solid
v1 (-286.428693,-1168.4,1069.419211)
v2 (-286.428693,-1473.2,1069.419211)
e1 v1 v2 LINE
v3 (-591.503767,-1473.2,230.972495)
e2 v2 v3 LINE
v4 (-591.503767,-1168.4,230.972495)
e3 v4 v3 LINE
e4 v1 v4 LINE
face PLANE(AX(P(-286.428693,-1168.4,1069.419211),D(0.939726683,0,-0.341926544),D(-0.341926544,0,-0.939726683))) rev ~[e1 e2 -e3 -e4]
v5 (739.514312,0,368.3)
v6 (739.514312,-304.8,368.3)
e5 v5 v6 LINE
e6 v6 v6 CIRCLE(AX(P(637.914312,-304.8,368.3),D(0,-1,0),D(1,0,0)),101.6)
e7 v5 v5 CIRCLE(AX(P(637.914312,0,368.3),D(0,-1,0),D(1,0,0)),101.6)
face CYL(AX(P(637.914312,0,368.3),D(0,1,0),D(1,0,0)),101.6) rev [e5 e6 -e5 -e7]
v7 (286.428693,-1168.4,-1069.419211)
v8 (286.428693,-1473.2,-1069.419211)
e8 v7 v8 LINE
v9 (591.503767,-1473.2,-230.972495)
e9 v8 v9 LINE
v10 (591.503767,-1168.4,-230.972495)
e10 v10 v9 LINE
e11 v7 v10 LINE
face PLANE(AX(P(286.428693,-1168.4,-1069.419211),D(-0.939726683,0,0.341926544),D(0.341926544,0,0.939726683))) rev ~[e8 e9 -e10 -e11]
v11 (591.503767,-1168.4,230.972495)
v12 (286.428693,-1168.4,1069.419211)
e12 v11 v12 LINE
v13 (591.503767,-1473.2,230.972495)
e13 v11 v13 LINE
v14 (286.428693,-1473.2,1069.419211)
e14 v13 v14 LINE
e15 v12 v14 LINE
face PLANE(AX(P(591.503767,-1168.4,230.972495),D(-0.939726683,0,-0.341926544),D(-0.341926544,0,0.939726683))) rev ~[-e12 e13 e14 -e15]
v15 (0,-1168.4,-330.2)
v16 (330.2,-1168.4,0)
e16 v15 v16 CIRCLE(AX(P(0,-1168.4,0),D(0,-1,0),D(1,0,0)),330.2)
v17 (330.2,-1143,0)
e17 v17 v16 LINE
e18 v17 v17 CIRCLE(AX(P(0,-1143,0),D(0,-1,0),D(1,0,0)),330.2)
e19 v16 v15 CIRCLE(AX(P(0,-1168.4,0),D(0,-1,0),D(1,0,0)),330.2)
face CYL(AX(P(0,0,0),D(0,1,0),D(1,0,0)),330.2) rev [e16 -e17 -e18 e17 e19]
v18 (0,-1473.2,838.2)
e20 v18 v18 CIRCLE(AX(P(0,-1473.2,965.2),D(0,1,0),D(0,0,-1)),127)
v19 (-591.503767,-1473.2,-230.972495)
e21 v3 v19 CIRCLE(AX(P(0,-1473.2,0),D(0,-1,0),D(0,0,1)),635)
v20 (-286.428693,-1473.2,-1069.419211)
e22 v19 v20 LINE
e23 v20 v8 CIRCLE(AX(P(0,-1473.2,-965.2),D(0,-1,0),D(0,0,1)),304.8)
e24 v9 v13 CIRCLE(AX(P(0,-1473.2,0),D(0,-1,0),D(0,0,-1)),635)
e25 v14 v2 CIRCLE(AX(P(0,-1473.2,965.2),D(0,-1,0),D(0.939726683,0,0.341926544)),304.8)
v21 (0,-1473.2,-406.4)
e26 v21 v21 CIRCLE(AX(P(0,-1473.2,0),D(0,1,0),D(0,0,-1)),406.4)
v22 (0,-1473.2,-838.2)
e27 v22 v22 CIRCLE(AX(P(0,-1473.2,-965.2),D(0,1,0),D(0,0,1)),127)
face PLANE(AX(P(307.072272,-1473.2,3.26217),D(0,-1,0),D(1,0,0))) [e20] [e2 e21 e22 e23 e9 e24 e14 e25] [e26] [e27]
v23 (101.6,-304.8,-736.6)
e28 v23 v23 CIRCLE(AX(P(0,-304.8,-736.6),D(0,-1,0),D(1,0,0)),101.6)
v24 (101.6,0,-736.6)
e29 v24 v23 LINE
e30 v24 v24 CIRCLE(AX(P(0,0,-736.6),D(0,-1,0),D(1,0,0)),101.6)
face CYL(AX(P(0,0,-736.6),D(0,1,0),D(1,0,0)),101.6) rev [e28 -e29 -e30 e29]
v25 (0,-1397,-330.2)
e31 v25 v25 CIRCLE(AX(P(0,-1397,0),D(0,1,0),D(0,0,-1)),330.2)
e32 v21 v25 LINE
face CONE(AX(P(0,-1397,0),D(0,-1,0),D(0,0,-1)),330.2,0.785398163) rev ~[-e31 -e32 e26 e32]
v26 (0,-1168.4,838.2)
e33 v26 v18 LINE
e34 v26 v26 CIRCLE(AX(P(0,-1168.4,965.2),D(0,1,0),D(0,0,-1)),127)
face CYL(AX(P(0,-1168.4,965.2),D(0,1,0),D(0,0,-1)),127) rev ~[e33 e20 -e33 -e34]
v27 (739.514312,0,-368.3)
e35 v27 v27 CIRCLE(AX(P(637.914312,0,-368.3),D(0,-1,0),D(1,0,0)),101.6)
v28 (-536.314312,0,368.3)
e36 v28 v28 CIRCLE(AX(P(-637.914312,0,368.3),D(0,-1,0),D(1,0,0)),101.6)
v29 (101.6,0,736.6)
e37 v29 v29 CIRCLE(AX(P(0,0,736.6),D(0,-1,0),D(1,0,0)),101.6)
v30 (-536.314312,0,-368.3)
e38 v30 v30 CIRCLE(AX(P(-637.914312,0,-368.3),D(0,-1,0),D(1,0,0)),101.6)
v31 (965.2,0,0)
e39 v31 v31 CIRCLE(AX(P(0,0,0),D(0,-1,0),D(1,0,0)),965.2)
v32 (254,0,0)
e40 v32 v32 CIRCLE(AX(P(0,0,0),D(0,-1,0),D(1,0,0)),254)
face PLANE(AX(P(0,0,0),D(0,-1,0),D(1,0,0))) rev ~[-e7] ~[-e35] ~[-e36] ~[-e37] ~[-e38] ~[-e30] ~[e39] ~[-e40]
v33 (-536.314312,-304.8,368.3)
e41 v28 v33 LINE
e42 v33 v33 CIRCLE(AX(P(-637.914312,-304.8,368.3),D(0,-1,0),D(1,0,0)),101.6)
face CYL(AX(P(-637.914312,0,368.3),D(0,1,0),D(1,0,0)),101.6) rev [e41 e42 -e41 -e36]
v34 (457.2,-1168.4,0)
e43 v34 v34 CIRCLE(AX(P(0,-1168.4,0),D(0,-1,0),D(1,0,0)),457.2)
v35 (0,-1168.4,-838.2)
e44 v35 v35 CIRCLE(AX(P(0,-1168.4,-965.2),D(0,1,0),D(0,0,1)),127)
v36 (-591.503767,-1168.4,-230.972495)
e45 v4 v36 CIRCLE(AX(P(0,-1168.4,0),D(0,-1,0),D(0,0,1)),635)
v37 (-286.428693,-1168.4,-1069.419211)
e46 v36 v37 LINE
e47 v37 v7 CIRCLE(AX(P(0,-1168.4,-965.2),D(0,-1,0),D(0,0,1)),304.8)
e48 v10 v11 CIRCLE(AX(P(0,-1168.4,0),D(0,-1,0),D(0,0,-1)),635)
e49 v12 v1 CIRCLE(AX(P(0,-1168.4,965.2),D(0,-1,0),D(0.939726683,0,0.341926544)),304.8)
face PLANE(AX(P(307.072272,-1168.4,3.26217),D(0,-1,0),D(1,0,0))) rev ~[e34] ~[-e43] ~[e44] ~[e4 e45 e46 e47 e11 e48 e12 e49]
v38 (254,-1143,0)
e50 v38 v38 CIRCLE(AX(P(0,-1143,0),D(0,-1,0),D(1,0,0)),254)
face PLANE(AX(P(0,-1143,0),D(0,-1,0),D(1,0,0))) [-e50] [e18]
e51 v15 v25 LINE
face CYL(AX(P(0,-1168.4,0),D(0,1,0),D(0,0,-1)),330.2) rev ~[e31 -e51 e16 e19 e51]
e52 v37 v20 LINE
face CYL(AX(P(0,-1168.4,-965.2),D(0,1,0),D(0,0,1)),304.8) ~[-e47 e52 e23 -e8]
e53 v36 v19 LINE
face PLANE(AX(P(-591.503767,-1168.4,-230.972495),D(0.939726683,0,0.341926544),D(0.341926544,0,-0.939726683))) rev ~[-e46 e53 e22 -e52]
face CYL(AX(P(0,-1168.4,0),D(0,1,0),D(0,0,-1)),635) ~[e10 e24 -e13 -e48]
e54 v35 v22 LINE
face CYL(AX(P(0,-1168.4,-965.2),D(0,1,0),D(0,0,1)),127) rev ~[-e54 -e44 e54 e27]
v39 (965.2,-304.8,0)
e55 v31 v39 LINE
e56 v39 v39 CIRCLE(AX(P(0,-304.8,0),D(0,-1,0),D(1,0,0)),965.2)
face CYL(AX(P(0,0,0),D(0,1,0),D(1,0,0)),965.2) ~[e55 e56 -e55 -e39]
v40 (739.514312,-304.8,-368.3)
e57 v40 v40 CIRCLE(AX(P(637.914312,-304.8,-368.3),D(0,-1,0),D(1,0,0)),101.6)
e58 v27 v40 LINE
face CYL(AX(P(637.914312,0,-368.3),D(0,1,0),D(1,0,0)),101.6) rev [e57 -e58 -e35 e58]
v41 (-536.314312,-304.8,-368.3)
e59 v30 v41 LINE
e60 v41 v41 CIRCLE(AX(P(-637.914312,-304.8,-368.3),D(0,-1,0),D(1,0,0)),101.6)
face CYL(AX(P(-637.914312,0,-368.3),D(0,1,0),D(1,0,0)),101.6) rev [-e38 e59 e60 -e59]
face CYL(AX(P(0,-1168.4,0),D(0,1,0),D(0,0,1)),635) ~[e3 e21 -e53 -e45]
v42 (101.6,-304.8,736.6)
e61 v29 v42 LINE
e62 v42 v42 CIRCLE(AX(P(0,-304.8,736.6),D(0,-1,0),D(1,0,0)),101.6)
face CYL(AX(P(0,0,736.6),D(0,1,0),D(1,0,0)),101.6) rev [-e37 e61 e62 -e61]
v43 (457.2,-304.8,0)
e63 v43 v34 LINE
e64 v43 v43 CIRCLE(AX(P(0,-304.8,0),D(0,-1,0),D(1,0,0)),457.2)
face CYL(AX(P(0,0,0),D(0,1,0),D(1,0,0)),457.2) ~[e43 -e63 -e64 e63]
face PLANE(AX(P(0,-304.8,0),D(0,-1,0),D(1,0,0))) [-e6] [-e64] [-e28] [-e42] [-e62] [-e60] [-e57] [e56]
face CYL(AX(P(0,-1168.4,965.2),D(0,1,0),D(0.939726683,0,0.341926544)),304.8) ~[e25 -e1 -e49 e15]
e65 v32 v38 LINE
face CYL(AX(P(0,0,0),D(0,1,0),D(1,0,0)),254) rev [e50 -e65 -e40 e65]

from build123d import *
from build123d import SkipClean  # not in build123d's __all__

# Parameters (mm, degrees)
F0_R     = 965.2
F0_R_2   = 101.6
F0_R_3   = 457.2
F1_DEPTH = 304.8
F0_R_4   = 330.2
F2_DEPTH = 1168.4
F0_R_5   = 254
F3_DEPTH = 1143
F5_DEPTH = 304.8
F6_SIZE2 = 76.2
F6_SIZE  = 76.2


# Not quite as in the source:
# - a feature names something its author has since deleted; it is built from what else it names


with BuildPart() as f1:
    # F0 (on Front) → F1 (new body)
    with BuildSketch(Plane.XZ):
        Circle(F0_R)
        with Locations((-637.9143124276, -368.3)):
            Circle(F0_R_2, mode=Mode.SUBTRACT)
        with Locations((0, -736.6)):
            Circle(F0_R_2, mode=Mode.SUBTRACT)
        with Locations((637.9143124276, -368.3)):
            Circle(F0_R_2, mode=Mode.SUBTRACT)
        with Locations((-637.9143124276, 368.3)):
            Circle(F0_R_2, mode=Mode.SUBTRACT)
        Circle(F0_R_3, mode=Mode.SUBTRACT)
        with Locations((637.9143124276, 368.3)):
            Circle(F0_R_2, mode=Mode.SUBTRACT)
        with Locations((0, 736.6)):
            Circle(F0_R_2, mode=Mode.SUBTRACT)
    extrude(amount=F1_DEPTH)

    # F0 (on Front) → F2 (join)
    with BuildSketch(Plane.XZ):
        Circle(F0_R_3)
        Circle(F0_R_4, mode=Mode.SUBTRACT)
    extrude(amount=F2_DEPTH)

    # F0 (on Front) → F3 (join)
    with BuildSketch(Plane.XZ):
        Circle(F0_R_4)
        Circle(F0_R_5, mode=Mode.SUBTRACT)
    extrude(amount=F3_DEPTH)

    # F4 (on face) → F5 (join)
    with BuildSketch(Plane.XZ.offset(1168.4)):
        with BuildLine():
            ThreePointArc((591.503767336, -230.9724945255), (624.031206054, -117.5161855696), (635, 0))
            ThreePointArc((635, 0), (624.031206054, 117.5161855696), (591.503767336, 230.9724945255))
            ThreePointArc((591.503767336, 230.9724945255), (358.1602057574, 524.3531891882), (0, 635))
            Line((0, 635), (0, 457.2))
            ThreePointArc((0, 457.2), (323.2892203585, 323.2892203585), (457.2, 0))
            ThreePointArc((457.2, 0), (323.2892203585, -323.2892203585), (0, -457.2))
            Line((0, -457.2), (0, -635))
            ThreePointArc((0, -635), (358.1602057574, -524.3531891882), (591.503767336, -230.9724945255))
        make_face()
        with BuildLine():
            ThreePointArc((0, 635), (358.1602057574, 524.3531891882), (591.503767336, 230.9724945255))
            Line((591.503767336, 230.9724945255), (286.428692972, 1069.4192105246))
            ThreePointArc((286.428692972, 1069.4192105246), (300.172038686, 1018.1130153278), (304.8, 965.2))
            ThreePointArc((304.8, 965.2), (215.5261469057, 749.6738530943), (0, 660.4))
            Line((0, 660.4), (0, 635))
        make_face()
        with BuildLine():
            Line((286.428692972, -1069.4192105246), (591.503767336, -230.9724945255))
            ThreePointArc((591.503767336, -230.9724945255), (358.1602057574, -524.3531891882), (0, -635))
            Line((0, -635), (0, -660.4))
            ThreePointArc((0, -660.4), (215.5261469057, -749.6738530943), (304.8, -965.2))
            ThreePointArc((304.8, -965.2), (300.172038686, -1018.1130153278), (286.428692972, -1069.4192105246))
        make_face()
        with BuildLine():
            Line((0, 457.2), (0, 635))
            ThreePointArc((0, 635), (-358.1602057574, 524.3531891882), (-591.503767336, 230.9724945255))
            ThreePointArc((-591.503767336, 230.9724945255), (-635, 0), (-591.503767336, -230.9724945255))
            ThreePointArc((-591.503767336, -230.9724945255), (-358.1602057574, -524.3531891882), (0, -635))
            Line((0, -635), (0, -457.2))
            ThreePointArc((0, -457.2), (-457.2, 0), (0, 457.2))
        make_face()
        with BuildLine():
            ThreePointArc((-591.503767336, 230.9724945255), (-358.1602057574, 524.3531891882), (0, 635))
            Line((0, 635), (0, 660.4))
            ThreePointArc((0, 660.4), (-249.6688360288, 790.3614678738), (-286.428692972, 1069.4192105246))
            Line((-286.428692972, 1069.4192105246), (-591.503767336, 230.9724945255))
        make_face()
        with BuildLine():
            ThreePointArc((304.8, 965.2), (300.172038686, 1018.1130153278), (286.428692972, 1069.4192105246))
            ThreePointArc((286.428692972, 1069.4192105246), (0, 1270), (-286.428692972, 1069.4192105246))
            ThreePointArc((-286.428692972, 1069.4192105246), (-249.6688360288, 790.3614678738), (0, 660.4))
            ThreePointArc((0, 660.4), (215.5261469057, 749.6738530943), (304.8, 965.2))
        make_face()
        with BuildLine():
            ThreePointArc((127, 965.2), (89.8025612107, 875.3974387893), (0, 838.2))
            ThreePointArc((0, 838.2), (-89.8025612107, 1055.0025612107), (127, 965.2))
        make_face(mode=Mode.SUBTRACT)
        with BuildLine():
            Line((0, -660.4), (0, -635))
            ThreePointArc((0, -635), (-358.1602057574, -524.3531891882), (-591.503767336, -230.9724945255))
            Line((-591.503767336, -230.9724945255), (-286.428692972, -1069.4192105246))
            ThreePointArc((-286.428692972, -1069.4192105246), (-249.6688360288, -790.3614678738), (0, -660.4))
        make_face()
        with BuildLine():
            ThreePointArc((-286.428692972, -1069.4192105246), (0, -1270), (286.428692972, -1069.4192105246))
            ThreePointArc((286.428692972, -1069.4192105246), (300.172038686, -1018.1130153278), (304.8, -965.2))
            ThreePointArc((304.8, -965.2), (215.5261469057, -749.6738530943), (0, -660.4))
            ThreePointArc((0, -660.4), (-249.6688360288, -790.3614678738), (-286.428692972, -1069.4192105246))
        make_face()
        with BuildLine():
            ThreePointArc((127, -965.2), (-89.8025612107, -1055.0025612107), (0, -838.2))
            ThreePointArc((0, -838.2), (89.8025612107, -875.3974387893), (127, -965.2))
        make_face(mode=Mode.SUBTRACT)
        with BuildLine():
            ThreePointArc((457.2, 0), (323.2892203585, 323.2892203585), (0, 457.2))
            Line((0, 457.2), (0, 330.2))
            ThreePointArc((0, 330.2), (233.4866591478, 233.4866591478), (330.2, 0))
            ThreePointArc((330.2, 0), (233.4866591478, -233.4866591478), (0, -330.2))
            Line((0, -330.2), (0, -457.2))
            ThreePointArc((0, -457.2), (323.2892203585, -323.2892203585), (457.2, 0))
        make_face()
        with BuildLine():
            Line((0, 330.2), (0, 457.2))
            ThreePointArc((0, 457.2), (-457.2, 0), (0, -457.2))
            Line((0, -457.2), (0, -330.2))
            ThreePointArc((0, -330.2), (-330.2, 0), (0, 330.2))
        make_face()
    with SkipClean():  # cleaning this boolean's faces spoils the solid; the shape is the same uncleaned
        extrude(amount=F5_DEPTH)

    # F6
    f6_edges = [f1.edges().sort_by_distance(p)[0] for p in [
        (0, -1473.2, 330.2),
    ]]
    chamfer(f6_edges, length=F6_SIZE, length2=F6_SIZE2)


solid = f1.part
